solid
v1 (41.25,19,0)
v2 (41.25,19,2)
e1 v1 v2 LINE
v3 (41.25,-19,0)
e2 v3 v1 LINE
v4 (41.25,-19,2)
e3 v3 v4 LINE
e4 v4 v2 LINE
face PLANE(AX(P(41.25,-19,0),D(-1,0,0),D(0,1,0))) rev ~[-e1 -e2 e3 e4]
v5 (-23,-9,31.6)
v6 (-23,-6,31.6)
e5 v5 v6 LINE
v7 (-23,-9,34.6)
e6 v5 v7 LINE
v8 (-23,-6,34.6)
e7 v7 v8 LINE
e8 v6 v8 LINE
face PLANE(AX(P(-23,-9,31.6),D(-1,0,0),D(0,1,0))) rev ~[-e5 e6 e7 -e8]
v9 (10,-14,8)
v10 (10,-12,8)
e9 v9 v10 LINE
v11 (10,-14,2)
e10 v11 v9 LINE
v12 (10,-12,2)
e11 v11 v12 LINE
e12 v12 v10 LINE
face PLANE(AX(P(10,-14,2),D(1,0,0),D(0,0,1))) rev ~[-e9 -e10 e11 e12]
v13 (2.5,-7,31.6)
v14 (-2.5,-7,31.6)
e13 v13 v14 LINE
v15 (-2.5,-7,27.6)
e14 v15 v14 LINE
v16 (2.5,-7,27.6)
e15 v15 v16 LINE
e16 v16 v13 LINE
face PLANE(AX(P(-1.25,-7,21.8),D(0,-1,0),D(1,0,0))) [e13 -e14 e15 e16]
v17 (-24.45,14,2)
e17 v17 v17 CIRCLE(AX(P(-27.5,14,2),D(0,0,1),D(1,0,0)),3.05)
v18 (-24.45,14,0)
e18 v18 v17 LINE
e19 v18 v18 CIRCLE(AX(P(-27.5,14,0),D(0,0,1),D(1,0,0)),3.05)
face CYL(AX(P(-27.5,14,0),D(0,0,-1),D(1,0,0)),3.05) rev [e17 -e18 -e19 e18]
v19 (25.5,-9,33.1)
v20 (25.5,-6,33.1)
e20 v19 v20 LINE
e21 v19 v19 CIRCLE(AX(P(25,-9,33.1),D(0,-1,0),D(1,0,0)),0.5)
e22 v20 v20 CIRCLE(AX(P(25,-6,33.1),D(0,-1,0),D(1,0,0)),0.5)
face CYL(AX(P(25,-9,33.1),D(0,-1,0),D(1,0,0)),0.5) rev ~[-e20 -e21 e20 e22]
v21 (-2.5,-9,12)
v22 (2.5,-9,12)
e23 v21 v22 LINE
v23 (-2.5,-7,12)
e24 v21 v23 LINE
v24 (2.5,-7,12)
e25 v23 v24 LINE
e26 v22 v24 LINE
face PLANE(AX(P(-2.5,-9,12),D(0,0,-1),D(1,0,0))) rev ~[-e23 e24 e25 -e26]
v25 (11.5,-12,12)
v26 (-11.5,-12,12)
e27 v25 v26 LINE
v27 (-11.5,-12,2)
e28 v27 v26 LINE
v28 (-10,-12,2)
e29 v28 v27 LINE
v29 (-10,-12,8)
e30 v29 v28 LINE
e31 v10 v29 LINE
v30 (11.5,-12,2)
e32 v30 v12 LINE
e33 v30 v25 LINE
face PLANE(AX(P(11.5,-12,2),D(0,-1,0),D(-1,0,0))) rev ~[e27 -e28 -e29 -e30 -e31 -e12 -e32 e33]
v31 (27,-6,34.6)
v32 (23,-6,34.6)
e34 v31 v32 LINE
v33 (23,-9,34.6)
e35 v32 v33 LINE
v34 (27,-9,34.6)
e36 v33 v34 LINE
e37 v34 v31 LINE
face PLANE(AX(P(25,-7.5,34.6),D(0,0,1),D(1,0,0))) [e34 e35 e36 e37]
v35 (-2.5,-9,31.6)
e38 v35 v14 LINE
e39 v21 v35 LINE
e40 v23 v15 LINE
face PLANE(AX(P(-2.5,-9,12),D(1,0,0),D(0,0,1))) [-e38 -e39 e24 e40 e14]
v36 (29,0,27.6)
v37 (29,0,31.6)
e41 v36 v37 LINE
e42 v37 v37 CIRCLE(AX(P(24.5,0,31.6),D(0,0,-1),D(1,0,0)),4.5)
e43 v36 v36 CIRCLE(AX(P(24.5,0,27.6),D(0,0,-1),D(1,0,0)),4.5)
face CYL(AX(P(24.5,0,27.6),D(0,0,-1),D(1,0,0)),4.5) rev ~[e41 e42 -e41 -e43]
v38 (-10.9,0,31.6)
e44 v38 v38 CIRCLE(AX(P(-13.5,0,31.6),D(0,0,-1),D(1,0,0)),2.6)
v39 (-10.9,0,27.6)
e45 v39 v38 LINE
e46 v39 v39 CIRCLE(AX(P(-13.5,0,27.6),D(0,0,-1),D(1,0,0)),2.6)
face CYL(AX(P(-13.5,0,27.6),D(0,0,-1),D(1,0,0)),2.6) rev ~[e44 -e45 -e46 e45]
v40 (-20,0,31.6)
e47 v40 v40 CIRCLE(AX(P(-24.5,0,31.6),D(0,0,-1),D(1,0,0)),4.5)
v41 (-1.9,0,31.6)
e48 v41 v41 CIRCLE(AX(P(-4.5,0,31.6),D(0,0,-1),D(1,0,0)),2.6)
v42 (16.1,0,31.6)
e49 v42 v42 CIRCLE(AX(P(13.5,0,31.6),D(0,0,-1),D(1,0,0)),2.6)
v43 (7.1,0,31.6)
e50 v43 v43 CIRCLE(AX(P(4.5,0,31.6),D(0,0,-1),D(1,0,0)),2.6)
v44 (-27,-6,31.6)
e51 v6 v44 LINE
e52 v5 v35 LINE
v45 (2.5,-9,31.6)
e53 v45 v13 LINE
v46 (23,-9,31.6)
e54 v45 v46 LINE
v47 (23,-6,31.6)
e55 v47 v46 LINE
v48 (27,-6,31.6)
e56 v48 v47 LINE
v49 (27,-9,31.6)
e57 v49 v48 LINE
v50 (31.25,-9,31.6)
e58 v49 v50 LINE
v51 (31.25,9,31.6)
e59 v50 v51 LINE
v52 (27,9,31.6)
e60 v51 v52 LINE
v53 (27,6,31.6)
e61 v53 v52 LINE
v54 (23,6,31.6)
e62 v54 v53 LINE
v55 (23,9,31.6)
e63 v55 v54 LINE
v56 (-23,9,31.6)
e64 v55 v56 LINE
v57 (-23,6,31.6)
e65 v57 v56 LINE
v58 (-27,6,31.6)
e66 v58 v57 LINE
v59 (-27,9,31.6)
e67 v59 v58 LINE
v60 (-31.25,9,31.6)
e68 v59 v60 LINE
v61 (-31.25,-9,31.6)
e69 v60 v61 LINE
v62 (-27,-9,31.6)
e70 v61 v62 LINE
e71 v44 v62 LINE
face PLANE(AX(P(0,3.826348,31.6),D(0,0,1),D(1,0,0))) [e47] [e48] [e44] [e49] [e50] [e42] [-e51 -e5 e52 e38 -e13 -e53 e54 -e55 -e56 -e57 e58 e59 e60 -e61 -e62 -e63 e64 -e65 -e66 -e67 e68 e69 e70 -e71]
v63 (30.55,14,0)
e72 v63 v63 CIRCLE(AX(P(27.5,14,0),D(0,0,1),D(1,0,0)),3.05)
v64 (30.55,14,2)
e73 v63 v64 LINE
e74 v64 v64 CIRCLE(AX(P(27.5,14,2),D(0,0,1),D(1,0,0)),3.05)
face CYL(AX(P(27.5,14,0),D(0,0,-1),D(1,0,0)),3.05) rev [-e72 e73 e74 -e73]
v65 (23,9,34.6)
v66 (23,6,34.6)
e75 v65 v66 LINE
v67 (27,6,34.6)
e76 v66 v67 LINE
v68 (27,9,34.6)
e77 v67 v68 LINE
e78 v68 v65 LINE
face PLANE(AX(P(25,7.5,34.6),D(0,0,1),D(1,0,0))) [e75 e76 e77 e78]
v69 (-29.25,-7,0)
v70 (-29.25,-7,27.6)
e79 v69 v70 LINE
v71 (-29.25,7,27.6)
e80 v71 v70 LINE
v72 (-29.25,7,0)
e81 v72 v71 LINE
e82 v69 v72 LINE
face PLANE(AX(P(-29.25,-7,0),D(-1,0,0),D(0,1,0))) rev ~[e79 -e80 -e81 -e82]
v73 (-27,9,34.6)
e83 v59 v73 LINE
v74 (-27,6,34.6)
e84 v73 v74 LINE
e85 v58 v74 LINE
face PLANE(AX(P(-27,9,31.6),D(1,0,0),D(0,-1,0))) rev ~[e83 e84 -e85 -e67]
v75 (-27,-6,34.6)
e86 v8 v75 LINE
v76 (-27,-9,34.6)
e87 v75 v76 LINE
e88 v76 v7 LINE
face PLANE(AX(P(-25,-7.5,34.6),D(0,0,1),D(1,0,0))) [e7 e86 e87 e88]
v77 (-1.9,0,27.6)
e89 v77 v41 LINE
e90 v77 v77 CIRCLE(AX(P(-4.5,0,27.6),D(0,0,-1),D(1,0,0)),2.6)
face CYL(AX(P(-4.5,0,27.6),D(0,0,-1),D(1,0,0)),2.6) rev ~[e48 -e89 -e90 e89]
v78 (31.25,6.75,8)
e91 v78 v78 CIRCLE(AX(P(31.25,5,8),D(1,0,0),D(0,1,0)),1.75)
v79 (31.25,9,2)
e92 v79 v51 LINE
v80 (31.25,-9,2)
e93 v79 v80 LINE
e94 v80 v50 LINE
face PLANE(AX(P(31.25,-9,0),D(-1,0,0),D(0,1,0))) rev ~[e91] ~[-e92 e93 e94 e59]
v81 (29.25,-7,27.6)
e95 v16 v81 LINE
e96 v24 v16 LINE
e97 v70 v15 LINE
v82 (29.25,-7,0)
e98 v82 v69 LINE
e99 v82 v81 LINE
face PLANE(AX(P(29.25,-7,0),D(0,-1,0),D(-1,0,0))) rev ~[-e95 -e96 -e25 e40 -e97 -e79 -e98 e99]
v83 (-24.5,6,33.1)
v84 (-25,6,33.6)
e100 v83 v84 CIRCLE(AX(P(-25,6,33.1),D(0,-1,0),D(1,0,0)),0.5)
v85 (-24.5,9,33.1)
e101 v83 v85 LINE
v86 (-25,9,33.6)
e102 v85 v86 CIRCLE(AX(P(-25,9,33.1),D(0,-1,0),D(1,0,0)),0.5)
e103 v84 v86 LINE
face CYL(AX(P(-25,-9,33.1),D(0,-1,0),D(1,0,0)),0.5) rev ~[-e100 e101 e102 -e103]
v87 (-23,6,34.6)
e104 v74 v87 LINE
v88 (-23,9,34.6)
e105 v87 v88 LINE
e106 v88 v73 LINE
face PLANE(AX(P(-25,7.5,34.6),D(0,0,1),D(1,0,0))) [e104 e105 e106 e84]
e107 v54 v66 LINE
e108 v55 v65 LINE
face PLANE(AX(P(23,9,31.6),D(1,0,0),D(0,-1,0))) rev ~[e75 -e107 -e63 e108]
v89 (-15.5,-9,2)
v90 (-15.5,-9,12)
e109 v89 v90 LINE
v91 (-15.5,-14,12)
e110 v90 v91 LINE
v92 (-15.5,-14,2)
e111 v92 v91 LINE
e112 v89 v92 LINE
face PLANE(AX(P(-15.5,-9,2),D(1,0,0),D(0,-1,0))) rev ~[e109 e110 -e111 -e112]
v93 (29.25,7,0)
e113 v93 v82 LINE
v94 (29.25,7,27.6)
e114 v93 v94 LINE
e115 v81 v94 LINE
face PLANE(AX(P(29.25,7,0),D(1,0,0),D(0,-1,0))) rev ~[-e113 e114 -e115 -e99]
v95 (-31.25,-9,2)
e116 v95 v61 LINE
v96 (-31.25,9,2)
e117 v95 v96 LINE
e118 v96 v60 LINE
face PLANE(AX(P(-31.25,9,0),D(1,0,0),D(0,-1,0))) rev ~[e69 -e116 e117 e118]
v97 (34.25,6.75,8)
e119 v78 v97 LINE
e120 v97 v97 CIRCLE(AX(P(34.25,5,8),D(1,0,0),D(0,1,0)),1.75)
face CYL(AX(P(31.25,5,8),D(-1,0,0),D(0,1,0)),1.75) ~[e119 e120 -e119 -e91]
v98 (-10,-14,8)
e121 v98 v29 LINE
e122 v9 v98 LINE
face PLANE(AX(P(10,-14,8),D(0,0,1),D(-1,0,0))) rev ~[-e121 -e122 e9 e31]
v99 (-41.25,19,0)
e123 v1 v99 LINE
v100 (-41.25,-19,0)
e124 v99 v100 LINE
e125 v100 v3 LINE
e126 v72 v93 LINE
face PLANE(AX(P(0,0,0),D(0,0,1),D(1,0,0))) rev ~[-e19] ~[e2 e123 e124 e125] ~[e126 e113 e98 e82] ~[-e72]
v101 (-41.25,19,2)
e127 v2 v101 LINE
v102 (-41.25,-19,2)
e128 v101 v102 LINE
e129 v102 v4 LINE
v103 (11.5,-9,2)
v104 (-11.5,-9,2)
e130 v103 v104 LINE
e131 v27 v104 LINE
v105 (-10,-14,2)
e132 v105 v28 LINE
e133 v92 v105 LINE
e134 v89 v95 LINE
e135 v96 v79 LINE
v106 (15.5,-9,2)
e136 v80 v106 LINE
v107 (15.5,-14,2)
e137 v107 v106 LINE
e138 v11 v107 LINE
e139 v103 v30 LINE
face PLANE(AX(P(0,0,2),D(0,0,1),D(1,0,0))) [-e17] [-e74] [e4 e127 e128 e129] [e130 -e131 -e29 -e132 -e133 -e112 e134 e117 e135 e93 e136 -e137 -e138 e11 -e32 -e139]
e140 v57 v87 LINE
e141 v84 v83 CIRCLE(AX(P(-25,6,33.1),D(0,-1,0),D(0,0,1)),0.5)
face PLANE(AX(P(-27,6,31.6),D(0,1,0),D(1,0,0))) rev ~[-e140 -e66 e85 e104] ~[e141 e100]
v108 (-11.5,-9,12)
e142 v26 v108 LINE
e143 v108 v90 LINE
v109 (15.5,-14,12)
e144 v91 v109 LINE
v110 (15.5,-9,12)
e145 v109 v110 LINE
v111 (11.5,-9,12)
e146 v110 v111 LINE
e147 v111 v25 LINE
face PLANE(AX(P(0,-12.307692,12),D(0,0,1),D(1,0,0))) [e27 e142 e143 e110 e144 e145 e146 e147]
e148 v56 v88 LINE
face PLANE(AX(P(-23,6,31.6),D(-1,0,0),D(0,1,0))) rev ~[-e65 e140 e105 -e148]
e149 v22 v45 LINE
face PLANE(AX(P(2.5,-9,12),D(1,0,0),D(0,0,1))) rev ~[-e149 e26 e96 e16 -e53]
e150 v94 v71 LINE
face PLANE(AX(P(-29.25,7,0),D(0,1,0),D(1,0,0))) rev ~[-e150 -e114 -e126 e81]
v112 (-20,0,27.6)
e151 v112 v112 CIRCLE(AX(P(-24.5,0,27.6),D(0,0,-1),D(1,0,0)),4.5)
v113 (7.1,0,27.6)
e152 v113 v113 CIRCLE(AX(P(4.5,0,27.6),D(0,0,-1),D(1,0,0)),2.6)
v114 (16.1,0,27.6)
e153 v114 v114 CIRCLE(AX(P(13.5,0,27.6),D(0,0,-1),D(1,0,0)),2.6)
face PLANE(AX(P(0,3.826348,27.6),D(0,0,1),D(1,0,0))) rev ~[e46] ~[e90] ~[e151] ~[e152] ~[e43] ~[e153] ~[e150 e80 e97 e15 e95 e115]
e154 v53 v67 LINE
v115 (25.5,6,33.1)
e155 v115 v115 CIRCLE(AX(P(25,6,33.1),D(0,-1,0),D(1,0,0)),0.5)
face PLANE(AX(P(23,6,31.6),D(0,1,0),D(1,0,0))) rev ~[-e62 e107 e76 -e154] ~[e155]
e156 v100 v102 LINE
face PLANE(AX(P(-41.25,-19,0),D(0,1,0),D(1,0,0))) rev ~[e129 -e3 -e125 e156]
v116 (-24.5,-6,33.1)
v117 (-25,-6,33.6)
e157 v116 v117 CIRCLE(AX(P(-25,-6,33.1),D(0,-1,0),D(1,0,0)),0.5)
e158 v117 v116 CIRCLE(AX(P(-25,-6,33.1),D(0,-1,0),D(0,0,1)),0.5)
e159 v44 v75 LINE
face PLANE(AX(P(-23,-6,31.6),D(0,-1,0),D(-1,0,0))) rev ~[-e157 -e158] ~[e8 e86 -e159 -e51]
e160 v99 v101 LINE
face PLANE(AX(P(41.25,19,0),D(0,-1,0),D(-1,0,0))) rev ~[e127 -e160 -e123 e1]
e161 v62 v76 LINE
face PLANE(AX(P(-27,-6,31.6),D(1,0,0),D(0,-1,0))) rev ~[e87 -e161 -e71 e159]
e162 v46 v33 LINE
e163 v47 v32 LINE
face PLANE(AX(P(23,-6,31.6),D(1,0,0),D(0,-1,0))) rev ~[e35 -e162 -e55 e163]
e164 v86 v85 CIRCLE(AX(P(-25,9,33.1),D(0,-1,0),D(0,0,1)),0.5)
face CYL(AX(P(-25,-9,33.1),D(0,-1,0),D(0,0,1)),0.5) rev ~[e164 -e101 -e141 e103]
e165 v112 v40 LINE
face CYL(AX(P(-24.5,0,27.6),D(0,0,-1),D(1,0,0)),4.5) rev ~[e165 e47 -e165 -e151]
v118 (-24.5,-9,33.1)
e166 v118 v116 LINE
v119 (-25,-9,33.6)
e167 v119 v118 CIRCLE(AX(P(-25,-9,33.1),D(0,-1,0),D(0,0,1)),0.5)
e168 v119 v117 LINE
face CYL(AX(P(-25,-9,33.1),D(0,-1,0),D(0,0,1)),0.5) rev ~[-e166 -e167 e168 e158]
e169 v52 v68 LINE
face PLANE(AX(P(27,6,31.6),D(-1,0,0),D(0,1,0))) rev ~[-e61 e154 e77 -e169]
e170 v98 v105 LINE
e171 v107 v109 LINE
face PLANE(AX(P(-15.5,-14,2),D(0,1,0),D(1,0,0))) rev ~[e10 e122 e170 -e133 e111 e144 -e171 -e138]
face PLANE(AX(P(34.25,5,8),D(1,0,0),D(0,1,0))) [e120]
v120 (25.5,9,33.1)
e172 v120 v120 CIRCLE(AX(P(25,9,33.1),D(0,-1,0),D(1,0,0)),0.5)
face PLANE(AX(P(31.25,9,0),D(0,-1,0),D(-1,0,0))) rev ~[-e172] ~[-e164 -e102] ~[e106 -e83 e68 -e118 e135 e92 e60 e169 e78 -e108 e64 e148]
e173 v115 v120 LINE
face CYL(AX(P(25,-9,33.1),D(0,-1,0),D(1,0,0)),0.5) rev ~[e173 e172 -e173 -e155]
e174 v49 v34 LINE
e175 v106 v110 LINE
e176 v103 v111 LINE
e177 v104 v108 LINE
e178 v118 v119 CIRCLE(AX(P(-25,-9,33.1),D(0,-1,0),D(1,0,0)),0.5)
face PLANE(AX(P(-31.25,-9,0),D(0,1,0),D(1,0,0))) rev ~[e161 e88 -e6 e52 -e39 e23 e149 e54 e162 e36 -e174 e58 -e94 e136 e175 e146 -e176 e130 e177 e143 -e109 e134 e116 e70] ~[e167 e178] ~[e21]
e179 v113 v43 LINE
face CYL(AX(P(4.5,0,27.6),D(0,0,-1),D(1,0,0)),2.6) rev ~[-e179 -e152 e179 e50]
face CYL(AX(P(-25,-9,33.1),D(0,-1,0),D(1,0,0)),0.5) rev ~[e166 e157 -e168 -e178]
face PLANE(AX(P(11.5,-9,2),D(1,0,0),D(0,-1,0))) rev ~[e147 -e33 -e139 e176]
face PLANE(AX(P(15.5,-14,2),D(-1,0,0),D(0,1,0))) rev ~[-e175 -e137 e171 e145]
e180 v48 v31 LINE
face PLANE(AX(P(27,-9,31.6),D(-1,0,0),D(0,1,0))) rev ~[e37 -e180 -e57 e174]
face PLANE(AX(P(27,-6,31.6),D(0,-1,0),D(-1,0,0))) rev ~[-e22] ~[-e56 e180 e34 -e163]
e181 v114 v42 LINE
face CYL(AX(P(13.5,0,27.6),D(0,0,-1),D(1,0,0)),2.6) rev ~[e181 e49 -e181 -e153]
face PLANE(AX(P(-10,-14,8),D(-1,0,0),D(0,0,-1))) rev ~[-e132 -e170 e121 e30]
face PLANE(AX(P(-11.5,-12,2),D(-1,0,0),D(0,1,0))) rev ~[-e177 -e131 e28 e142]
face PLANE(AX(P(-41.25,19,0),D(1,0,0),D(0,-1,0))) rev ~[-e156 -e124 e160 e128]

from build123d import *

# Parameters (mm, degrees)
F1_DEPTH  = 31.6
F2_START  = 27.6
F2_DEPTH  = 4
F0_R      = 3.05
F3_DEPTH  = 2
F4_W      = 2.5
F4_H      = 19.6
F5_DEPTH  = 2
F7_DEPTH  = 3
F8_R      = 0.5
F9_DEPTH  = 25
F10_R     = 1.75
F11_DEPTH = 3
F13_DEPTH = 10
F15_DEPTH = 4


# Not quite as in the source:
# - a feature names something its author has since deleted; it is built from what else it names


with BuildPart() as f1:
    # F0 (on Top) → F1 (new body)
    with BuildSketch(Plane.XY):
        Polygon((31.25, -9), (31.25, 0), (29.25, 0), (29.25, -7), (-29.25, -7), (-29.25, 0), (-31.25, 0), (-31.25, -9), align=None)
        Polygon((31.25, 0), (31.25, 9), (-31.25, 9), (-31.25, 0), (-29.25, 0), (-29.25, 7), (29.25, 7), (29.25, 0), align=None)
    extrude(amount=F1_DEPTH)

    # F0 (on Top) → F2 (join)
    with BuildSketch(Plane.XY.offset(F2_START)):
        with BuildLine():
            Line((29, 0), (29.25, 0))
            Line((29.25, 0), (29.25, 7))
            Line((29.25, 7), (-29.25, 7))
            Line((-29.25, 7), (-29.25, 0))
            Line((-29.25, 0), (-29, 0))
            ThreePointArc((-29, 0), (-24.5, 4.5), (-20, 0))
            Line((-20, 0), (-16.1, 0))
            ThreePointArc((-16.1, 0), (-13.5, 2.6), (-10.9, 0))
            Line((-10.9, 0), (-7.1, 0))
            ThreePointArc((-7.1, 0), (-4.5, 2.6), (-1.9, 0))
            Line((-1.9, 0), (0, 0))
            Line((0, 0), (1.9, 0))
            ThreePointArc((1.9, 0), (4.5, 2.6), (7.1, 0))
            Line((7.1, 0), (10.9, 0))
            ThreePointArc((10.9, 0), (13.5, 2.6), (16.1, 0))
            Line((16.1, 0), (20, 0))
            ThreePointArc((20, 0), (24.5, 4.5), (29, 0))
        make_face()
        with BuildLine():
            Line((29.25, -7), (29.25, 0))
            Line((29.25, 0), (29, 0))
            ThreePointArc((29, 0), (24.5, -4.5), (20, 0))
            Line((20, 0), (16.1, 0))
            ThreePointArc((16.1, 0), (13.5, -2.6), (10.9, 0))
            Line((10.9, 0), (7.1, 0))
            ThreePointArc((7.1, 0), (4.5, -2.6), (1.9, 0))
            Line((1.9, 0), (0, 0))
            Line((0, 0), (-1.9, 0))
            ThreePointArc((-1.9, 0), (-4.5, -2.6), (-7.1, 0))
            Line((-7.1, 0), (-10.9, 0))
            ThreePointArc((-10.9, 0), (-13.5, -2.6), (-16.1, 0))
            Line((-16.1, 0), (-20, 0))
            ThreePointArc((-20, 0), (-24.5, -4.5), (-29, 0))
            Line((-29, 0), (-29.25, 0))
            Line((-29.25, 0), (-29.25, -7))
            Line((-29.25, -7), (29.25, -7))
        make_face()
    extrude(amount=F2_DEPTH)

    # F0 (on Top) → F3 (join)
    with BuildSketch(Plane.XY):
        Polygon((-41.25, 19), (-41.25, 14), (-41.25, -19), (41.25, -19), (41.25, 19), align=None)
        with Locations((-27.5, 14)):
            Circle(F0_R, mode=Mode.SUBTRACT)
        Polygon((-31.25, 9), (31.25, 9), (31.25, 0), (31.25, -9), (-31.25, -9), (-31.25, 0), align=None, mode=Mode.SUBTRACT)
        with Locations((27.5, 14)):
            Circle(F0_R, mode=Mode.SUBTRACT)
    extrude(amount=F3_DEPTH)

    # F4 (on face) → F5 (cut)
    with BuildSketch(Plane.XZ.offset(9)):
        with Locations((-1.25, 21.8)):
            Rectangle(F4_W, F4_H)
        with Locations((1.25, 21.8)):
            Rectangle(F4_W, F4_H)
    extrude(amount=-F5_DEPTH, mode=Mode.SUBTRACT)

    # F6 (on face) → F7 (join)
    with BuildSketch(Plane.XY.offset(31.6)):
        Polygon((-27, -6), (-27, -9), (-25, -9), (-23, -9), (-23, -6), (-25, -6), align=None)
        Polygon((23, -6), (23, -9), (25, -9), (27, -9), (27, -6), (25, -6), align=None)
        Polygon((-23, 6), (-23, 9), (-25, 9), (-27, 9), (-27, 6), (-25, 6), align=None)
        Polygon((25, 6), (27, 6), (27, 9), (25, 9), (23, 9), (23, 6), align=None)
    extrude(amount=F7_DEPTH)

    # F8 (on face) → F9 (cut)
    with BuildSketch(Plane.XZ.offset(9)):
        with BuildLine():
            ThreePointArc((-25, 33.6), (-25.3535533906, 32.7464466094), (-24.5, 33.1))
            ThreePointArc((-24.5, 33.1), (-24.6464466094, 33.4535533906), (-25, 33.6))
        make_face()
        with Locations((25, 33.1)):
            Circle(F8_R)
    extrude(amount=-F9_DEPTH, mode=Mode.SUBTRACT)

    # F10 (on face) → F11 (join)
    with BuildSketch(Plane.YZ.offset(31.25)):
        with Locations((5, 8)):
            Circle(F10_R)
    extrude(amount=F11_DEPTH)

    # F12 (on face) → F13 (join)
    with BuildSketch(Plane.XY.offset(2)):
        Polygon((-11.5, -9), (-15.5, -9), (-15.5, -11), (-15.5, -14), (0, -14), (15.5, -14), (15.5, -11), (15.5, -9), (11.5, -9), (11.5, -12), (0, -12), (-11.5, -12), align=None)
    extrude(amount=F13_DEPTH)

    # F14 (on face) → F15 (cut)
    with BuildSketch(Plane.XZ.offset(14)):
        Polygon((-10, 2), (0, 2), (10, 2), (10, 8), (0, 8), (-10, 8), align=None)
    extrude(amount=-F15_DEPTH, mode=Mode.SUBTRACT)


solid = f1.part
